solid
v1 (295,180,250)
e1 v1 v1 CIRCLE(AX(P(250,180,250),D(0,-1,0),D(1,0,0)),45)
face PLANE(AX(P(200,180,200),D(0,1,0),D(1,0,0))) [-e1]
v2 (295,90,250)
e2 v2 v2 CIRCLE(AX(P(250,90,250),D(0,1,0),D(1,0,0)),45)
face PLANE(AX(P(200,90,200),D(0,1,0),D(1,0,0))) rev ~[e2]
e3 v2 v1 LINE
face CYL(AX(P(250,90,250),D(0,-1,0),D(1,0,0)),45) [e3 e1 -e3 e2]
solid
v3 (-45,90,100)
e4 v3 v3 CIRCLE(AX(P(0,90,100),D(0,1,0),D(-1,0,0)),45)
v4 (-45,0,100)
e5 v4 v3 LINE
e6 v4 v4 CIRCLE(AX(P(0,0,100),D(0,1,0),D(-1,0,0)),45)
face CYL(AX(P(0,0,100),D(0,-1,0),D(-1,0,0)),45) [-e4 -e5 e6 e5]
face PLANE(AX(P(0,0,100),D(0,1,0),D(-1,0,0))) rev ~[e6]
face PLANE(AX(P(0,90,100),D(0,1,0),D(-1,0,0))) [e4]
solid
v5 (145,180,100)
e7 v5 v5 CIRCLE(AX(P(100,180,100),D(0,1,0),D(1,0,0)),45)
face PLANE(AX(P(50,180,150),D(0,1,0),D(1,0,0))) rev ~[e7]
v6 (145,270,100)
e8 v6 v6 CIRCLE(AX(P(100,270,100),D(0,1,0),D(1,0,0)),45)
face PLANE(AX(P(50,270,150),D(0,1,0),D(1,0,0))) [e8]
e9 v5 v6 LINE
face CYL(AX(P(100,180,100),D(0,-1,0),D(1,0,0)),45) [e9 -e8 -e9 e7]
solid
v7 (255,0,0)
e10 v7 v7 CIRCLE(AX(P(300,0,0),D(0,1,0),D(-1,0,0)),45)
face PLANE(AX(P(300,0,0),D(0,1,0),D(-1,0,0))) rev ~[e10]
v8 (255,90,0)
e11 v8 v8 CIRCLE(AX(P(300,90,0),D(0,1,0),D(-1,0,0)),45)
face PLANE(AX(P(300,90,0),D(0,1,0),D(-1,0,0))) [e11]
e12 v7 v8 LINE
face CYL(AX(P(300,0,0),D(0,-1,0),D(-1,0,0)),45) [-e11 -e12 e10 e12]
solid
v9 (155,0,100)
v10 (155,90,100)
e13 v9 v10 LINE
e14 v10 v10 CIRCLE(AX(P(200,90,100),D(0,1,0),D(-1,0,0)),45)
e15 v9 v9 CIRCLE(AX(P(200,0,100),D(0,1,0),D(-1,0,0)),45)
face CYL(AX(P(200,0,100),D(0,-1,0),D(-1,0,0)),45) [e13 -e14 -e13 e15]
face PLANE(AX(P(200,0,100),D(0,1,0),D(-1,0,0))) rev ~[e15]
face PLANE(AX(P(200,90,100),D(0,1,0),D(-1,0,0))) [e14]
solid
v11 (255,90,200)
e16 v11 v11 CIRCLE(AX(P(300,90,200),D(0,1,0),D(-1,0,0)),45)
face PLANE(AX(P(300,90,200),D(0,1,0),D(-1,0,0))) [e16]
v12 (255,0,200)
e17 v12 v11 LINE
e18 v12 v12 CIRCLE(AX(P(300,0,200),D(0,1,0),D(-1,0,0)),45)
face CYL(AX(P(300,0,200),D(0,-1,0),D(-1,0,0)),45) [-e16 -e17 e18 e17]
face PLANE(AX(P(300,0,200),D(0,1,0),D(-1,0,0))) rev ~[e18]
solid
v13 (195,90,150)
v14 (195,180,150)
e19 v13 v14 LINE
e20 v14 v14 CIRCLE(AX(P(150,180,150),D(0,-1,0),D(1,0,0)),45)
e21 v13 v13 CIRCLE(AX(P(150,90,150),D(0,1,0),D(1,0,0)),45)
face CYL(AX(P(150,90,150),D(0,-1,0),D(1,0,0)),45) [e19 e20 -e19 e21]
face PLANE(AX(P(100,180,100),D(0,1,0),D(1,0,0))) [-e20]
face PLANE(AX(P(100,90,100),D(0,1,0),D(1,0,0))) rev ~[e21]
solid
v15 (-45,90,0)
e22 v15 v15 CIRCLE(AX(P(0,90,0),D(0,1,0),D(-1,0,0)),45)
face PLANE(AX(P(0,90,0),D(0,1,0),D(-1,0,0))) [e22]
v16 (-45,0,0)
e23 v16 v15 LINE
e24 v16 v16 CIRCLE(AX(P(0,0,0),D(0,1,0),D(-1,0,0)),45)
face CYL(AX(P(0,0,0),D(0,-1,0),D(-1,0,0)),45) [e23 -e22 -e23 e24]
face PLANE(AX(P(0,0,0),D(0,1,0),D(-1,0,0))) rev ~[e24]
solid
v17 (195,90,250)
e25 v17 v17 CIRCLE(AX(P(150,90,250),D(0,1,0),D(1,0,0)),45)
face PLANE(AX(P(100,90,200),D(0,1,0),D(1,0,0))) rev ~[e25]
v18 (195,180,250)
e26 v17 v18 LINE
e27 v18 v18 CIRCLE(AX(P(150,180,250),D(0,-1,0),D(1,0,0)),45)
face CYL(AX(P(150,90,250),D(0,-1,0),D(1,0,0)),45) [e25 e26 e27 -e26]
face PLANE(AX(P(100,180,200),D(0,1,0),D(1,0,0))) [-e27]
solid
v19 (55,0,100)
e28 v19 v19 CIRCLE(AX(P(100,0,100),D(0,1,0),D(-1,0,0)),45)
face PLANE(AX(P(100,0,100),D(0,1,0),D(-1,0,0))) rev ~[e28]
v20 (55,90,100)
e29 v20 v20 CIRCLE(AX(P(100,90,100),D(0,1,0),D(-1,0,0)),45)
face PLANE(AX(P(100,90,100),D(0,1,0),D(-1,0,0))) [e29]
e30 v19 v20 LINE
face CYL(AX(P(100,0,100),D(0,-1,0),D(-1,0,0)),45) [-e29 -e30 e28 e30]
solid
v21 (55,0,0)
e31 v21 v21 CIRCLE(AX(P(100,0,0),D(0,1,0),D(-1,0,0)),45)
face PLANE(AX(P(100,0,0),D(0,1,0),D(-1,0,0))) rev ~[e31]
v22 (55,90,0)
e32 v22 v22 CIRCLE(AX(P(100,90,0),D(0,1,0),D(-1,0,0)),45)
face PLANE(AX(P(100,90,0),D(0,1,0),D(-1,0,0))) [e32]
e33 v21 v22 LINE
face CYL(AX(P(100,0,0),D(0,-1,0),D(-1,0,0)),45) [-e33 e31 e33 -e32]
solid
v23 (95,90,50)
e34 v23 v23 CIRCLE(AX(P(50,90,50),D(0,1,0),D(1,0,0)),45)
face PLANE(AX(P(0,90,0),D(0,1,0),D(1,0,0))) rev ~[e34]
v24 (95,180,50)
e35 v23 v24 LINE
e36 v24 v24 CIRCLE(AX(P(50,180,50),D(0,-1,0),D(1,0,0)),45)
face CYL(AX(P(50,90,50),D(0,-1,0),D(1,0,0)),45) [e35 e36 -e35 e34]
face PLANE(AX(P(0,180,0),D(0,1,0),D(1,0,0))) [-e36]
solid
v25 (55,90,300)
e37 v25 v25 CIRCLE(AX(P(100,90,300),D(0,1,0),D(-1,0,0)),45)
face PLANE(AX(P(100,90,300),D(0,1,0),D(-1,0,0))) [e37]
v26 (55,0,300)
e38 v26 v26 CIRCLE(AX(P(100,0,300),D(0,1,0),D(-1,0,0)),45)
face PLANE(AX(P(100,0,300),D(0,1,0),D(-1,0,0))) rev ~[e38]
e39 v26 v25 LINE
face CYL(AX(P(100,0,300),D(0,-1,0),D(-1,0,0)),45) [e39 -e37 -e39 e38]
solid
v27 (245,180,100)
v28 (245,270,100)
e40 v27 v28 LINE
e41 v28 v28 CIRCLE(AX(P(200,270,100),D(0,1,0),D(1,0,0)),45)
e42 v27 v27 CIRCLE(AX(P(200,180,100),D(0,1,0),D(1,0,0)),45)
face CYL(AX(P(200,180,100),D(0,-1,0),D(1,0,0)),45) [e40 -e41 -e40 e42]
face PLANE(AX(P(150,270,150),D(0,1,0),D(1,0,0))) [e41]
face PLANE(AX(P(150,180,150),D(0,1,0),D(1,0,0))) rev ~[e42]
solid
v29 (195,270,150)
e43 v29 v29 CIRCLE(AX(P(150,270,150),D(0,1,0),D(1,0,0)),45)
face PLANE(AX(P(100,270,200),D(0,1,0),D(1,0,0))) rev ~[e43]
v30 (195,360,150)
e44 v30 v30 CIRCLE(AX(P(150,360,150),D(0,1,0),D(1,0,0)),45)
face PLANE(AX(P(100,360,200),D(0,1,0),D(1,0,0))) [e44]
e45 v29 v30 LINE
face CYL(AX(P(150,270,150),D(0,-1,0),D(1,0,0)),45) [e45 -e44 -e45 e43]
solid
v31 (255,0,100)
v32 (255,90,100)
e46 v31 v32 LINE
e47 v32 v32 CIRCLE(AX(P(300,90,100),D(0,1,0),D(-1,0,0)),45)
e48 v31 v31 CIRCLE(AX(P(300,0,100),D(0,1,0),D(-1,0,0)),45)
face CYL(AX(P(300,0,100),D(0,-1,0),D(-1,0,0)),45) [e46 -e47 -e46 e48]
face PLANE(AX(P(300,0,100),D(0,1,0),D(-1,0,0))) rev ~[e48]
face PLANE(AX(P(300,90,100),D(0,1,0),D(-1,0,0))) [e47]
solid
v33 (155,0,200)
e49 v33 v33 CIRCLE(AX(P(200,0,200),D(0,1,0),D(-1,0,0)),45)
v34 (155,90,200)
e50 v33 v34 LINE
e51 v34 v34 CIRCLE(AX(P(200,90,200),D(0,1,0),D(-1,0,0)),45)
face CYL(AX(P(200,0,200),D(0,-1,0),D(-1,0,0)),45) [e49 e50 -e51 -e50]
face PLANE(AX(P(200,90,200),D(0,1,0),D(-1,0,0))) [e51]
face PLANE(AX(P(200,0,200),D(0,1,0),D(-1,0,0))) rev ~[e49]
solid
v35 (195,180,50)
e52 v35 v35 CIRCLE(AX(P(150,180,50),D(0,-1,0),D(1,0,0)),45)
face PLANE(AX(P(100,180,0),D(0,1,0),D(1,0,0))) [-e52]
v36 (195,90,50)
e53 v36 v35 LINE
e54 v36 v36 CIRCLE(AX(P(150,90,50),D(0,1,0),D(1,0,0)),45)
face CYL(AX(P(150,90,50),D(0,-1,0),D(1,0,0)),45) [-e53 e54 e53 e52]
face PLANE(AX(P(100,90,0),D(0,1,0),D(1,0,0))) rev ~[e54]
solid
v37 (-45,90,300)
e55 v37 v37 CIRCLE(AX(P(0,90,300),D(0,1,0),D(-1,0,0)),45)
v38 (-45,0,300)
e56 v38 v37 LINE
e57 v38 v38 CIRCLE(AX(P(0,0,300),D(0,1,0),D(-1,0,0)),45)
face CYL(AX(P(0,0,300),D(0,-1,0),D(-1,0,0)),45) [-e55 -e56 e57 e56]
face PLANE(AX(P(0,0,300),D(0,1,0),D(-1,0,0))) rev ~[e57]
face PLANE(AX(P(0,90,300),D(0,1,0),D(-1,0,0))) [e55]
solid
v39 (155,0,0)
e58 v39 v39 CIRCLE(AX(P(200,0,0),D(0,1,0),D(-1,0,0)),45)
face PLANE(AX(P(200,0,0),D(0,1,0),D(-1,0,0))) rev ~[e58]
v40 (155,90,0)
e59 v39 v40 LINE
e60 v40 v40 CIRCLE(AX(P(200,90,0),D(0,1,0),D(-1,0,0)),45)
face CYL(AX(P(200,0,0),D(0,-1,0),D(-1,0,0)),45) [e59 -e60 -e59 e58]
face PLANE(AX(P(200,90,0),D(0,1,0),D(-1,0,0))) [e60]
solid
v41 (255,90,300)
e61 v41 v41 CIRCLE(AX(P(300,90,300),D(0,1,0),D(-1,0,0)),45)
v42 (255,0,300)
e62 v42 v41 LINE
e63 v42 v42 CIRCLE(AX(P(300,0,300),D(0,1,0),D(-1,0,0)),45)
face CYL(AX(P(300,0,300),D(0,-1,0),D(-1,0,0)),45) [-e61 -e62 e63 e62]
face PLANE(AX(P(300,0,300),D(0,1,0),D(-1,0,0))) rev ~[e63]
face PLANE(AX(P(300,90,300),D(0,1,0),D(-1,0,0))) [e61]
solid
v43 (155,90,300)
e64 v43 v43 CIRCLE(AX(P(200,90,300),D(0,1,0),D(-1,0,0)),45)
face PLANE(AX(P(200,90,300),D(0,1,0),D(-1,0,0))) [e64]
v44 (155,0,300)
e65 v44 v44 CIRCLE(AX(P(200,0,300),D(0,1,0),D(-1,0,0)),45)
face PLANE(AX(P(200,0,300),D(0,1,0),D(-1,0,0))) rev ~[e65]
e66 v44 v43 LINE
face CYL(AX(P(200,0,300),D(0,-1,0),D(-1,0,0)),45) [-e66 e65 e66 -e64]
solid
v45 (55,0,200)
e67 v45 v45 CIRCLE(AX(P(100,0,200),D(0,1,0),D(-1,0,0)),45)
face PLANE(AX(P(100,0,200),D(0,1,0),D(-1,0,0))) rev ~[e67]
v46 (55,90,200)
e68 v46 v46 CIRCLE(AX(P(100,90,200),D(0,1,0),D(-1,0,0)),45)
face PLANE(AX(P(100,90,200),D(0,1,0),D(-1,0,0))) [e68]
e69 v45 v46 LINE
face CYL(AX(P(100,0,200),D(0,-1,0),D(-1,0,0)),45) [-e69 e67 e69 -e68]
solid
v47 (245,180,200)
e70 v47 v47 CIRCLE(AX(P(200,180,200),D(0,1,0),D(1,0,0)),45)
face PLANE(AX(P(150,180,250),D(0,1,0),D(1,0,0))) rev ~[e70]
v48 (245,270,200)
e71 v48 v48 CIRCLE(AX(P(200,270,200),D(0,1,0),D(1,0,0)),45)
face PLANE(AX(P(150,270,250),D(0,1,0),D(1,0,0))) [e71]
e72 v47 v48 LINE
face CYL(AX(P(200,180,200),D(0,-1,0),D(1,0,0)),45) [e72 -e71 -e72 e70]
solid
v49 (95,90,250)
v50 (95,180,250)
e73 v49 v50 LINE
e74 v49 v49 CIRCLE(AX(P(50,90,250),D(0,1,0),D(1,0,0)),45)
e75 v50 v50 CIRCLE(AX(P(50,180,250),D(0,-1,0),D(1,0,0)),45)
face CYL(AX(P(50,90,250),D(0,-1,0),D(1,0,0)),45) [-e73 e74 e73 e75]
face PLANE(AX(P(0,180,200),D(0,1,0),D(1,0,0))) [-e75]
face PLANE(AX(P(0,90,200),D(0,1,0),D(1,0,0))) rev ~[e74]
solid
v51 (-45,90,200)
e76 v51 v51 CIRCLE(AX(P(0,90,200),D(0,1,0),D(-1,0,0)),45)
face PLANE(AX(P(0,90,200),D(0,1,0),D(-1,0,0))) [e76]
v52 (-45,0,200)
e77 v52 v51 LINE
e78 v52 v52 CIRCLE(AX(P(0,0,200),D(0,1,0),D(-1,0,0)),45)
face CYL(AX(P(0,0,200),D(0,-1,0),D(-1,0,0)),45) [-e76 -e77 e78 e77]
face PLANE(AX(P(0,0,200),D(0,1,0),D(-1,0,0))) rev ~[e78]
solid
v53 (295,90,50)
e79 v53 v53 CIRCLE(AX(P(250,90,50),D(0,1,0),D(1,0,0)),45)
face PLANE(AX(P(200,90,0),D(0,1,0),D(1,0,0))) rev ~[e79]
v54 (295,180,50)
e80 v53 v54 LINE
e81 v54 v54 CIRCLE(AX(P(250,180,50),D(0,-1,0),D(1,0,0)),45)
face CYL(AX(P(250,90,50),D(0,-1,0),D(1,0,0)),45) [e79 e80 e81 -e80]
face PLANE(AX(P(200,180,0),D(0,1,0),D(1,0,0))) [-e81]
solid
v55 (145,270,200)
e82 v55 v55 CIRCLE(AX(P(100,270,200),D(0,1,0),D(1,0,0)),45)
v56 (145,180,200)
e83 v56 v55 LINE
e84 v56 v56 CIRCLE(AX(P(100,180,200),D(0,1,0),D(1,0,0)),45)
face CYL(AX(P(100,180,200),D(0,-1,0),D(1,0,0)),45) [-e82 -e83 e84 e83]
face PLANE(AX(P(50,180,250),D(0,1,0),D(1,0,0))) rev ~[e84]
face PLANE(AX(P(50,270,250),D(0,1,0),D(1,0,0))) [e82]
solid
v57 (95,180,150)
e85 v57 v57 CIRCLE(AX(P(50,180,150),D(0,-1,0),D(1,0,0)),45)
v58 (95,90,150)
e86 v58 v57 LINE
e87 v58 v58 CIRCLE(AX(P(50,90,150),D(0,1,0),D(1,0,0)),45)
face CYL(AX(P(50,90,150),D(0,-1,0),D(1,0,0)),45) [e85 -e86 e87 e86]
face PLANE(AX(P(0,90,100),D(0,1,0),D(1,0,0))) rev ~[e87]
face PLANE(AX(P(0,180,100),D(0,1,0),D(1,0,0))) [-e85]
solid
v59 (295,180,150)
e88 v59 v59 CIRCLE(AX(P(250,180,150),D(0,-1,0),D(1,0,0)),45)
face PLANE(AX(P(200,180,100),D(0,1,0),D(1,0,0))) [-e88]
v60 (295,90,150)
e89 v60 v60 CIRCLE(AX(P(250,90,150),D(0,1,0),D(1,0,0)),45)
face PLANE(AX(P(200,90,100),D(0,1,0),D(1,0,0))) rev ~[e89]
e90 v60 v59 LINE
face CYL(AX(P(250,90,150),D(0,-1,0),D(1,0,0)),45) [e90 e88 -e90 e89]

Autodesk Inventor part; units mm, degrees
ref_plane "YZ Plane" through (0, 0, 0) normal (1, 0, 0) x (0, 1, 0)
ref_plane "XZ Plane" through (0, 0, 0) normal (0, 1, 0) x (-1, 0, 0)
ref_plane "XY Plane" through (0, 0, 0) normal (0, 0, 1) x (1, 0, 0)
sketch "Sketch1" plane through (0, 0, 0) normal (0, 1, 0) x (-1, 0, 0)
  circle A0 centre (0, 0) radius 45
  dimension "d0" = 90
extrude "Extrusion1" add sketch "Sketch1" along normal blind 90
pattern_linear "Rectangular Pattern1" count 4 spacing 100 along (1, 0, 0) count 4 spacing 100 along (0, 0, 1)
sketch "Sketch2" plane through (0, 90, 0) normal (0, 1, 0) x (1, 0, 0)
  circle A0 centre (100, -100) radius 45 projected
  line L0 (0, 0) -> (100, -100)
  circle A1 centre (50, -50) radius 45
  dimension "d9" = 90
extrude "Extrusion2" add sketch "Sketch2" along normal blind 90 separate body contours A1 L0 A0 | A0 L0 A1 | A1 L0 A0 | A0 L0 A1
pattern_linear "Rectangular Pattern2" count 3 spacing 100 along (1, 0, 0) count 3 spacing 100 along (0, 0, 1) bodies 2
sketch "Sketch3" plane through (50, 180, 150) normal (0, 1, 0) x (1, 0, 0)
  circle A0 centre (50, 50) radius 45 projected
  point P0 (-50, 150)
extrude "Extrusion3" add sketch "Sketch3" along normal blind 90 separate body
pattern_linear "Rectangular Pattern3" count 2 spacing 100 along (1, 0, 0) count 2 spacing 100 along (0, 0, 1) bodies 3
sketch "Sketch4" plane through (100, 270, 200) normal (0, 1, 0) x (1, 0, 0)
  circle A0 centre (50, 50) radius 45 projected
  point P0 (-100, 200)
extrude "Extrusion4" add sketch "Sketch4" along normal blind 90 separate body
properties part number "圓柱"
